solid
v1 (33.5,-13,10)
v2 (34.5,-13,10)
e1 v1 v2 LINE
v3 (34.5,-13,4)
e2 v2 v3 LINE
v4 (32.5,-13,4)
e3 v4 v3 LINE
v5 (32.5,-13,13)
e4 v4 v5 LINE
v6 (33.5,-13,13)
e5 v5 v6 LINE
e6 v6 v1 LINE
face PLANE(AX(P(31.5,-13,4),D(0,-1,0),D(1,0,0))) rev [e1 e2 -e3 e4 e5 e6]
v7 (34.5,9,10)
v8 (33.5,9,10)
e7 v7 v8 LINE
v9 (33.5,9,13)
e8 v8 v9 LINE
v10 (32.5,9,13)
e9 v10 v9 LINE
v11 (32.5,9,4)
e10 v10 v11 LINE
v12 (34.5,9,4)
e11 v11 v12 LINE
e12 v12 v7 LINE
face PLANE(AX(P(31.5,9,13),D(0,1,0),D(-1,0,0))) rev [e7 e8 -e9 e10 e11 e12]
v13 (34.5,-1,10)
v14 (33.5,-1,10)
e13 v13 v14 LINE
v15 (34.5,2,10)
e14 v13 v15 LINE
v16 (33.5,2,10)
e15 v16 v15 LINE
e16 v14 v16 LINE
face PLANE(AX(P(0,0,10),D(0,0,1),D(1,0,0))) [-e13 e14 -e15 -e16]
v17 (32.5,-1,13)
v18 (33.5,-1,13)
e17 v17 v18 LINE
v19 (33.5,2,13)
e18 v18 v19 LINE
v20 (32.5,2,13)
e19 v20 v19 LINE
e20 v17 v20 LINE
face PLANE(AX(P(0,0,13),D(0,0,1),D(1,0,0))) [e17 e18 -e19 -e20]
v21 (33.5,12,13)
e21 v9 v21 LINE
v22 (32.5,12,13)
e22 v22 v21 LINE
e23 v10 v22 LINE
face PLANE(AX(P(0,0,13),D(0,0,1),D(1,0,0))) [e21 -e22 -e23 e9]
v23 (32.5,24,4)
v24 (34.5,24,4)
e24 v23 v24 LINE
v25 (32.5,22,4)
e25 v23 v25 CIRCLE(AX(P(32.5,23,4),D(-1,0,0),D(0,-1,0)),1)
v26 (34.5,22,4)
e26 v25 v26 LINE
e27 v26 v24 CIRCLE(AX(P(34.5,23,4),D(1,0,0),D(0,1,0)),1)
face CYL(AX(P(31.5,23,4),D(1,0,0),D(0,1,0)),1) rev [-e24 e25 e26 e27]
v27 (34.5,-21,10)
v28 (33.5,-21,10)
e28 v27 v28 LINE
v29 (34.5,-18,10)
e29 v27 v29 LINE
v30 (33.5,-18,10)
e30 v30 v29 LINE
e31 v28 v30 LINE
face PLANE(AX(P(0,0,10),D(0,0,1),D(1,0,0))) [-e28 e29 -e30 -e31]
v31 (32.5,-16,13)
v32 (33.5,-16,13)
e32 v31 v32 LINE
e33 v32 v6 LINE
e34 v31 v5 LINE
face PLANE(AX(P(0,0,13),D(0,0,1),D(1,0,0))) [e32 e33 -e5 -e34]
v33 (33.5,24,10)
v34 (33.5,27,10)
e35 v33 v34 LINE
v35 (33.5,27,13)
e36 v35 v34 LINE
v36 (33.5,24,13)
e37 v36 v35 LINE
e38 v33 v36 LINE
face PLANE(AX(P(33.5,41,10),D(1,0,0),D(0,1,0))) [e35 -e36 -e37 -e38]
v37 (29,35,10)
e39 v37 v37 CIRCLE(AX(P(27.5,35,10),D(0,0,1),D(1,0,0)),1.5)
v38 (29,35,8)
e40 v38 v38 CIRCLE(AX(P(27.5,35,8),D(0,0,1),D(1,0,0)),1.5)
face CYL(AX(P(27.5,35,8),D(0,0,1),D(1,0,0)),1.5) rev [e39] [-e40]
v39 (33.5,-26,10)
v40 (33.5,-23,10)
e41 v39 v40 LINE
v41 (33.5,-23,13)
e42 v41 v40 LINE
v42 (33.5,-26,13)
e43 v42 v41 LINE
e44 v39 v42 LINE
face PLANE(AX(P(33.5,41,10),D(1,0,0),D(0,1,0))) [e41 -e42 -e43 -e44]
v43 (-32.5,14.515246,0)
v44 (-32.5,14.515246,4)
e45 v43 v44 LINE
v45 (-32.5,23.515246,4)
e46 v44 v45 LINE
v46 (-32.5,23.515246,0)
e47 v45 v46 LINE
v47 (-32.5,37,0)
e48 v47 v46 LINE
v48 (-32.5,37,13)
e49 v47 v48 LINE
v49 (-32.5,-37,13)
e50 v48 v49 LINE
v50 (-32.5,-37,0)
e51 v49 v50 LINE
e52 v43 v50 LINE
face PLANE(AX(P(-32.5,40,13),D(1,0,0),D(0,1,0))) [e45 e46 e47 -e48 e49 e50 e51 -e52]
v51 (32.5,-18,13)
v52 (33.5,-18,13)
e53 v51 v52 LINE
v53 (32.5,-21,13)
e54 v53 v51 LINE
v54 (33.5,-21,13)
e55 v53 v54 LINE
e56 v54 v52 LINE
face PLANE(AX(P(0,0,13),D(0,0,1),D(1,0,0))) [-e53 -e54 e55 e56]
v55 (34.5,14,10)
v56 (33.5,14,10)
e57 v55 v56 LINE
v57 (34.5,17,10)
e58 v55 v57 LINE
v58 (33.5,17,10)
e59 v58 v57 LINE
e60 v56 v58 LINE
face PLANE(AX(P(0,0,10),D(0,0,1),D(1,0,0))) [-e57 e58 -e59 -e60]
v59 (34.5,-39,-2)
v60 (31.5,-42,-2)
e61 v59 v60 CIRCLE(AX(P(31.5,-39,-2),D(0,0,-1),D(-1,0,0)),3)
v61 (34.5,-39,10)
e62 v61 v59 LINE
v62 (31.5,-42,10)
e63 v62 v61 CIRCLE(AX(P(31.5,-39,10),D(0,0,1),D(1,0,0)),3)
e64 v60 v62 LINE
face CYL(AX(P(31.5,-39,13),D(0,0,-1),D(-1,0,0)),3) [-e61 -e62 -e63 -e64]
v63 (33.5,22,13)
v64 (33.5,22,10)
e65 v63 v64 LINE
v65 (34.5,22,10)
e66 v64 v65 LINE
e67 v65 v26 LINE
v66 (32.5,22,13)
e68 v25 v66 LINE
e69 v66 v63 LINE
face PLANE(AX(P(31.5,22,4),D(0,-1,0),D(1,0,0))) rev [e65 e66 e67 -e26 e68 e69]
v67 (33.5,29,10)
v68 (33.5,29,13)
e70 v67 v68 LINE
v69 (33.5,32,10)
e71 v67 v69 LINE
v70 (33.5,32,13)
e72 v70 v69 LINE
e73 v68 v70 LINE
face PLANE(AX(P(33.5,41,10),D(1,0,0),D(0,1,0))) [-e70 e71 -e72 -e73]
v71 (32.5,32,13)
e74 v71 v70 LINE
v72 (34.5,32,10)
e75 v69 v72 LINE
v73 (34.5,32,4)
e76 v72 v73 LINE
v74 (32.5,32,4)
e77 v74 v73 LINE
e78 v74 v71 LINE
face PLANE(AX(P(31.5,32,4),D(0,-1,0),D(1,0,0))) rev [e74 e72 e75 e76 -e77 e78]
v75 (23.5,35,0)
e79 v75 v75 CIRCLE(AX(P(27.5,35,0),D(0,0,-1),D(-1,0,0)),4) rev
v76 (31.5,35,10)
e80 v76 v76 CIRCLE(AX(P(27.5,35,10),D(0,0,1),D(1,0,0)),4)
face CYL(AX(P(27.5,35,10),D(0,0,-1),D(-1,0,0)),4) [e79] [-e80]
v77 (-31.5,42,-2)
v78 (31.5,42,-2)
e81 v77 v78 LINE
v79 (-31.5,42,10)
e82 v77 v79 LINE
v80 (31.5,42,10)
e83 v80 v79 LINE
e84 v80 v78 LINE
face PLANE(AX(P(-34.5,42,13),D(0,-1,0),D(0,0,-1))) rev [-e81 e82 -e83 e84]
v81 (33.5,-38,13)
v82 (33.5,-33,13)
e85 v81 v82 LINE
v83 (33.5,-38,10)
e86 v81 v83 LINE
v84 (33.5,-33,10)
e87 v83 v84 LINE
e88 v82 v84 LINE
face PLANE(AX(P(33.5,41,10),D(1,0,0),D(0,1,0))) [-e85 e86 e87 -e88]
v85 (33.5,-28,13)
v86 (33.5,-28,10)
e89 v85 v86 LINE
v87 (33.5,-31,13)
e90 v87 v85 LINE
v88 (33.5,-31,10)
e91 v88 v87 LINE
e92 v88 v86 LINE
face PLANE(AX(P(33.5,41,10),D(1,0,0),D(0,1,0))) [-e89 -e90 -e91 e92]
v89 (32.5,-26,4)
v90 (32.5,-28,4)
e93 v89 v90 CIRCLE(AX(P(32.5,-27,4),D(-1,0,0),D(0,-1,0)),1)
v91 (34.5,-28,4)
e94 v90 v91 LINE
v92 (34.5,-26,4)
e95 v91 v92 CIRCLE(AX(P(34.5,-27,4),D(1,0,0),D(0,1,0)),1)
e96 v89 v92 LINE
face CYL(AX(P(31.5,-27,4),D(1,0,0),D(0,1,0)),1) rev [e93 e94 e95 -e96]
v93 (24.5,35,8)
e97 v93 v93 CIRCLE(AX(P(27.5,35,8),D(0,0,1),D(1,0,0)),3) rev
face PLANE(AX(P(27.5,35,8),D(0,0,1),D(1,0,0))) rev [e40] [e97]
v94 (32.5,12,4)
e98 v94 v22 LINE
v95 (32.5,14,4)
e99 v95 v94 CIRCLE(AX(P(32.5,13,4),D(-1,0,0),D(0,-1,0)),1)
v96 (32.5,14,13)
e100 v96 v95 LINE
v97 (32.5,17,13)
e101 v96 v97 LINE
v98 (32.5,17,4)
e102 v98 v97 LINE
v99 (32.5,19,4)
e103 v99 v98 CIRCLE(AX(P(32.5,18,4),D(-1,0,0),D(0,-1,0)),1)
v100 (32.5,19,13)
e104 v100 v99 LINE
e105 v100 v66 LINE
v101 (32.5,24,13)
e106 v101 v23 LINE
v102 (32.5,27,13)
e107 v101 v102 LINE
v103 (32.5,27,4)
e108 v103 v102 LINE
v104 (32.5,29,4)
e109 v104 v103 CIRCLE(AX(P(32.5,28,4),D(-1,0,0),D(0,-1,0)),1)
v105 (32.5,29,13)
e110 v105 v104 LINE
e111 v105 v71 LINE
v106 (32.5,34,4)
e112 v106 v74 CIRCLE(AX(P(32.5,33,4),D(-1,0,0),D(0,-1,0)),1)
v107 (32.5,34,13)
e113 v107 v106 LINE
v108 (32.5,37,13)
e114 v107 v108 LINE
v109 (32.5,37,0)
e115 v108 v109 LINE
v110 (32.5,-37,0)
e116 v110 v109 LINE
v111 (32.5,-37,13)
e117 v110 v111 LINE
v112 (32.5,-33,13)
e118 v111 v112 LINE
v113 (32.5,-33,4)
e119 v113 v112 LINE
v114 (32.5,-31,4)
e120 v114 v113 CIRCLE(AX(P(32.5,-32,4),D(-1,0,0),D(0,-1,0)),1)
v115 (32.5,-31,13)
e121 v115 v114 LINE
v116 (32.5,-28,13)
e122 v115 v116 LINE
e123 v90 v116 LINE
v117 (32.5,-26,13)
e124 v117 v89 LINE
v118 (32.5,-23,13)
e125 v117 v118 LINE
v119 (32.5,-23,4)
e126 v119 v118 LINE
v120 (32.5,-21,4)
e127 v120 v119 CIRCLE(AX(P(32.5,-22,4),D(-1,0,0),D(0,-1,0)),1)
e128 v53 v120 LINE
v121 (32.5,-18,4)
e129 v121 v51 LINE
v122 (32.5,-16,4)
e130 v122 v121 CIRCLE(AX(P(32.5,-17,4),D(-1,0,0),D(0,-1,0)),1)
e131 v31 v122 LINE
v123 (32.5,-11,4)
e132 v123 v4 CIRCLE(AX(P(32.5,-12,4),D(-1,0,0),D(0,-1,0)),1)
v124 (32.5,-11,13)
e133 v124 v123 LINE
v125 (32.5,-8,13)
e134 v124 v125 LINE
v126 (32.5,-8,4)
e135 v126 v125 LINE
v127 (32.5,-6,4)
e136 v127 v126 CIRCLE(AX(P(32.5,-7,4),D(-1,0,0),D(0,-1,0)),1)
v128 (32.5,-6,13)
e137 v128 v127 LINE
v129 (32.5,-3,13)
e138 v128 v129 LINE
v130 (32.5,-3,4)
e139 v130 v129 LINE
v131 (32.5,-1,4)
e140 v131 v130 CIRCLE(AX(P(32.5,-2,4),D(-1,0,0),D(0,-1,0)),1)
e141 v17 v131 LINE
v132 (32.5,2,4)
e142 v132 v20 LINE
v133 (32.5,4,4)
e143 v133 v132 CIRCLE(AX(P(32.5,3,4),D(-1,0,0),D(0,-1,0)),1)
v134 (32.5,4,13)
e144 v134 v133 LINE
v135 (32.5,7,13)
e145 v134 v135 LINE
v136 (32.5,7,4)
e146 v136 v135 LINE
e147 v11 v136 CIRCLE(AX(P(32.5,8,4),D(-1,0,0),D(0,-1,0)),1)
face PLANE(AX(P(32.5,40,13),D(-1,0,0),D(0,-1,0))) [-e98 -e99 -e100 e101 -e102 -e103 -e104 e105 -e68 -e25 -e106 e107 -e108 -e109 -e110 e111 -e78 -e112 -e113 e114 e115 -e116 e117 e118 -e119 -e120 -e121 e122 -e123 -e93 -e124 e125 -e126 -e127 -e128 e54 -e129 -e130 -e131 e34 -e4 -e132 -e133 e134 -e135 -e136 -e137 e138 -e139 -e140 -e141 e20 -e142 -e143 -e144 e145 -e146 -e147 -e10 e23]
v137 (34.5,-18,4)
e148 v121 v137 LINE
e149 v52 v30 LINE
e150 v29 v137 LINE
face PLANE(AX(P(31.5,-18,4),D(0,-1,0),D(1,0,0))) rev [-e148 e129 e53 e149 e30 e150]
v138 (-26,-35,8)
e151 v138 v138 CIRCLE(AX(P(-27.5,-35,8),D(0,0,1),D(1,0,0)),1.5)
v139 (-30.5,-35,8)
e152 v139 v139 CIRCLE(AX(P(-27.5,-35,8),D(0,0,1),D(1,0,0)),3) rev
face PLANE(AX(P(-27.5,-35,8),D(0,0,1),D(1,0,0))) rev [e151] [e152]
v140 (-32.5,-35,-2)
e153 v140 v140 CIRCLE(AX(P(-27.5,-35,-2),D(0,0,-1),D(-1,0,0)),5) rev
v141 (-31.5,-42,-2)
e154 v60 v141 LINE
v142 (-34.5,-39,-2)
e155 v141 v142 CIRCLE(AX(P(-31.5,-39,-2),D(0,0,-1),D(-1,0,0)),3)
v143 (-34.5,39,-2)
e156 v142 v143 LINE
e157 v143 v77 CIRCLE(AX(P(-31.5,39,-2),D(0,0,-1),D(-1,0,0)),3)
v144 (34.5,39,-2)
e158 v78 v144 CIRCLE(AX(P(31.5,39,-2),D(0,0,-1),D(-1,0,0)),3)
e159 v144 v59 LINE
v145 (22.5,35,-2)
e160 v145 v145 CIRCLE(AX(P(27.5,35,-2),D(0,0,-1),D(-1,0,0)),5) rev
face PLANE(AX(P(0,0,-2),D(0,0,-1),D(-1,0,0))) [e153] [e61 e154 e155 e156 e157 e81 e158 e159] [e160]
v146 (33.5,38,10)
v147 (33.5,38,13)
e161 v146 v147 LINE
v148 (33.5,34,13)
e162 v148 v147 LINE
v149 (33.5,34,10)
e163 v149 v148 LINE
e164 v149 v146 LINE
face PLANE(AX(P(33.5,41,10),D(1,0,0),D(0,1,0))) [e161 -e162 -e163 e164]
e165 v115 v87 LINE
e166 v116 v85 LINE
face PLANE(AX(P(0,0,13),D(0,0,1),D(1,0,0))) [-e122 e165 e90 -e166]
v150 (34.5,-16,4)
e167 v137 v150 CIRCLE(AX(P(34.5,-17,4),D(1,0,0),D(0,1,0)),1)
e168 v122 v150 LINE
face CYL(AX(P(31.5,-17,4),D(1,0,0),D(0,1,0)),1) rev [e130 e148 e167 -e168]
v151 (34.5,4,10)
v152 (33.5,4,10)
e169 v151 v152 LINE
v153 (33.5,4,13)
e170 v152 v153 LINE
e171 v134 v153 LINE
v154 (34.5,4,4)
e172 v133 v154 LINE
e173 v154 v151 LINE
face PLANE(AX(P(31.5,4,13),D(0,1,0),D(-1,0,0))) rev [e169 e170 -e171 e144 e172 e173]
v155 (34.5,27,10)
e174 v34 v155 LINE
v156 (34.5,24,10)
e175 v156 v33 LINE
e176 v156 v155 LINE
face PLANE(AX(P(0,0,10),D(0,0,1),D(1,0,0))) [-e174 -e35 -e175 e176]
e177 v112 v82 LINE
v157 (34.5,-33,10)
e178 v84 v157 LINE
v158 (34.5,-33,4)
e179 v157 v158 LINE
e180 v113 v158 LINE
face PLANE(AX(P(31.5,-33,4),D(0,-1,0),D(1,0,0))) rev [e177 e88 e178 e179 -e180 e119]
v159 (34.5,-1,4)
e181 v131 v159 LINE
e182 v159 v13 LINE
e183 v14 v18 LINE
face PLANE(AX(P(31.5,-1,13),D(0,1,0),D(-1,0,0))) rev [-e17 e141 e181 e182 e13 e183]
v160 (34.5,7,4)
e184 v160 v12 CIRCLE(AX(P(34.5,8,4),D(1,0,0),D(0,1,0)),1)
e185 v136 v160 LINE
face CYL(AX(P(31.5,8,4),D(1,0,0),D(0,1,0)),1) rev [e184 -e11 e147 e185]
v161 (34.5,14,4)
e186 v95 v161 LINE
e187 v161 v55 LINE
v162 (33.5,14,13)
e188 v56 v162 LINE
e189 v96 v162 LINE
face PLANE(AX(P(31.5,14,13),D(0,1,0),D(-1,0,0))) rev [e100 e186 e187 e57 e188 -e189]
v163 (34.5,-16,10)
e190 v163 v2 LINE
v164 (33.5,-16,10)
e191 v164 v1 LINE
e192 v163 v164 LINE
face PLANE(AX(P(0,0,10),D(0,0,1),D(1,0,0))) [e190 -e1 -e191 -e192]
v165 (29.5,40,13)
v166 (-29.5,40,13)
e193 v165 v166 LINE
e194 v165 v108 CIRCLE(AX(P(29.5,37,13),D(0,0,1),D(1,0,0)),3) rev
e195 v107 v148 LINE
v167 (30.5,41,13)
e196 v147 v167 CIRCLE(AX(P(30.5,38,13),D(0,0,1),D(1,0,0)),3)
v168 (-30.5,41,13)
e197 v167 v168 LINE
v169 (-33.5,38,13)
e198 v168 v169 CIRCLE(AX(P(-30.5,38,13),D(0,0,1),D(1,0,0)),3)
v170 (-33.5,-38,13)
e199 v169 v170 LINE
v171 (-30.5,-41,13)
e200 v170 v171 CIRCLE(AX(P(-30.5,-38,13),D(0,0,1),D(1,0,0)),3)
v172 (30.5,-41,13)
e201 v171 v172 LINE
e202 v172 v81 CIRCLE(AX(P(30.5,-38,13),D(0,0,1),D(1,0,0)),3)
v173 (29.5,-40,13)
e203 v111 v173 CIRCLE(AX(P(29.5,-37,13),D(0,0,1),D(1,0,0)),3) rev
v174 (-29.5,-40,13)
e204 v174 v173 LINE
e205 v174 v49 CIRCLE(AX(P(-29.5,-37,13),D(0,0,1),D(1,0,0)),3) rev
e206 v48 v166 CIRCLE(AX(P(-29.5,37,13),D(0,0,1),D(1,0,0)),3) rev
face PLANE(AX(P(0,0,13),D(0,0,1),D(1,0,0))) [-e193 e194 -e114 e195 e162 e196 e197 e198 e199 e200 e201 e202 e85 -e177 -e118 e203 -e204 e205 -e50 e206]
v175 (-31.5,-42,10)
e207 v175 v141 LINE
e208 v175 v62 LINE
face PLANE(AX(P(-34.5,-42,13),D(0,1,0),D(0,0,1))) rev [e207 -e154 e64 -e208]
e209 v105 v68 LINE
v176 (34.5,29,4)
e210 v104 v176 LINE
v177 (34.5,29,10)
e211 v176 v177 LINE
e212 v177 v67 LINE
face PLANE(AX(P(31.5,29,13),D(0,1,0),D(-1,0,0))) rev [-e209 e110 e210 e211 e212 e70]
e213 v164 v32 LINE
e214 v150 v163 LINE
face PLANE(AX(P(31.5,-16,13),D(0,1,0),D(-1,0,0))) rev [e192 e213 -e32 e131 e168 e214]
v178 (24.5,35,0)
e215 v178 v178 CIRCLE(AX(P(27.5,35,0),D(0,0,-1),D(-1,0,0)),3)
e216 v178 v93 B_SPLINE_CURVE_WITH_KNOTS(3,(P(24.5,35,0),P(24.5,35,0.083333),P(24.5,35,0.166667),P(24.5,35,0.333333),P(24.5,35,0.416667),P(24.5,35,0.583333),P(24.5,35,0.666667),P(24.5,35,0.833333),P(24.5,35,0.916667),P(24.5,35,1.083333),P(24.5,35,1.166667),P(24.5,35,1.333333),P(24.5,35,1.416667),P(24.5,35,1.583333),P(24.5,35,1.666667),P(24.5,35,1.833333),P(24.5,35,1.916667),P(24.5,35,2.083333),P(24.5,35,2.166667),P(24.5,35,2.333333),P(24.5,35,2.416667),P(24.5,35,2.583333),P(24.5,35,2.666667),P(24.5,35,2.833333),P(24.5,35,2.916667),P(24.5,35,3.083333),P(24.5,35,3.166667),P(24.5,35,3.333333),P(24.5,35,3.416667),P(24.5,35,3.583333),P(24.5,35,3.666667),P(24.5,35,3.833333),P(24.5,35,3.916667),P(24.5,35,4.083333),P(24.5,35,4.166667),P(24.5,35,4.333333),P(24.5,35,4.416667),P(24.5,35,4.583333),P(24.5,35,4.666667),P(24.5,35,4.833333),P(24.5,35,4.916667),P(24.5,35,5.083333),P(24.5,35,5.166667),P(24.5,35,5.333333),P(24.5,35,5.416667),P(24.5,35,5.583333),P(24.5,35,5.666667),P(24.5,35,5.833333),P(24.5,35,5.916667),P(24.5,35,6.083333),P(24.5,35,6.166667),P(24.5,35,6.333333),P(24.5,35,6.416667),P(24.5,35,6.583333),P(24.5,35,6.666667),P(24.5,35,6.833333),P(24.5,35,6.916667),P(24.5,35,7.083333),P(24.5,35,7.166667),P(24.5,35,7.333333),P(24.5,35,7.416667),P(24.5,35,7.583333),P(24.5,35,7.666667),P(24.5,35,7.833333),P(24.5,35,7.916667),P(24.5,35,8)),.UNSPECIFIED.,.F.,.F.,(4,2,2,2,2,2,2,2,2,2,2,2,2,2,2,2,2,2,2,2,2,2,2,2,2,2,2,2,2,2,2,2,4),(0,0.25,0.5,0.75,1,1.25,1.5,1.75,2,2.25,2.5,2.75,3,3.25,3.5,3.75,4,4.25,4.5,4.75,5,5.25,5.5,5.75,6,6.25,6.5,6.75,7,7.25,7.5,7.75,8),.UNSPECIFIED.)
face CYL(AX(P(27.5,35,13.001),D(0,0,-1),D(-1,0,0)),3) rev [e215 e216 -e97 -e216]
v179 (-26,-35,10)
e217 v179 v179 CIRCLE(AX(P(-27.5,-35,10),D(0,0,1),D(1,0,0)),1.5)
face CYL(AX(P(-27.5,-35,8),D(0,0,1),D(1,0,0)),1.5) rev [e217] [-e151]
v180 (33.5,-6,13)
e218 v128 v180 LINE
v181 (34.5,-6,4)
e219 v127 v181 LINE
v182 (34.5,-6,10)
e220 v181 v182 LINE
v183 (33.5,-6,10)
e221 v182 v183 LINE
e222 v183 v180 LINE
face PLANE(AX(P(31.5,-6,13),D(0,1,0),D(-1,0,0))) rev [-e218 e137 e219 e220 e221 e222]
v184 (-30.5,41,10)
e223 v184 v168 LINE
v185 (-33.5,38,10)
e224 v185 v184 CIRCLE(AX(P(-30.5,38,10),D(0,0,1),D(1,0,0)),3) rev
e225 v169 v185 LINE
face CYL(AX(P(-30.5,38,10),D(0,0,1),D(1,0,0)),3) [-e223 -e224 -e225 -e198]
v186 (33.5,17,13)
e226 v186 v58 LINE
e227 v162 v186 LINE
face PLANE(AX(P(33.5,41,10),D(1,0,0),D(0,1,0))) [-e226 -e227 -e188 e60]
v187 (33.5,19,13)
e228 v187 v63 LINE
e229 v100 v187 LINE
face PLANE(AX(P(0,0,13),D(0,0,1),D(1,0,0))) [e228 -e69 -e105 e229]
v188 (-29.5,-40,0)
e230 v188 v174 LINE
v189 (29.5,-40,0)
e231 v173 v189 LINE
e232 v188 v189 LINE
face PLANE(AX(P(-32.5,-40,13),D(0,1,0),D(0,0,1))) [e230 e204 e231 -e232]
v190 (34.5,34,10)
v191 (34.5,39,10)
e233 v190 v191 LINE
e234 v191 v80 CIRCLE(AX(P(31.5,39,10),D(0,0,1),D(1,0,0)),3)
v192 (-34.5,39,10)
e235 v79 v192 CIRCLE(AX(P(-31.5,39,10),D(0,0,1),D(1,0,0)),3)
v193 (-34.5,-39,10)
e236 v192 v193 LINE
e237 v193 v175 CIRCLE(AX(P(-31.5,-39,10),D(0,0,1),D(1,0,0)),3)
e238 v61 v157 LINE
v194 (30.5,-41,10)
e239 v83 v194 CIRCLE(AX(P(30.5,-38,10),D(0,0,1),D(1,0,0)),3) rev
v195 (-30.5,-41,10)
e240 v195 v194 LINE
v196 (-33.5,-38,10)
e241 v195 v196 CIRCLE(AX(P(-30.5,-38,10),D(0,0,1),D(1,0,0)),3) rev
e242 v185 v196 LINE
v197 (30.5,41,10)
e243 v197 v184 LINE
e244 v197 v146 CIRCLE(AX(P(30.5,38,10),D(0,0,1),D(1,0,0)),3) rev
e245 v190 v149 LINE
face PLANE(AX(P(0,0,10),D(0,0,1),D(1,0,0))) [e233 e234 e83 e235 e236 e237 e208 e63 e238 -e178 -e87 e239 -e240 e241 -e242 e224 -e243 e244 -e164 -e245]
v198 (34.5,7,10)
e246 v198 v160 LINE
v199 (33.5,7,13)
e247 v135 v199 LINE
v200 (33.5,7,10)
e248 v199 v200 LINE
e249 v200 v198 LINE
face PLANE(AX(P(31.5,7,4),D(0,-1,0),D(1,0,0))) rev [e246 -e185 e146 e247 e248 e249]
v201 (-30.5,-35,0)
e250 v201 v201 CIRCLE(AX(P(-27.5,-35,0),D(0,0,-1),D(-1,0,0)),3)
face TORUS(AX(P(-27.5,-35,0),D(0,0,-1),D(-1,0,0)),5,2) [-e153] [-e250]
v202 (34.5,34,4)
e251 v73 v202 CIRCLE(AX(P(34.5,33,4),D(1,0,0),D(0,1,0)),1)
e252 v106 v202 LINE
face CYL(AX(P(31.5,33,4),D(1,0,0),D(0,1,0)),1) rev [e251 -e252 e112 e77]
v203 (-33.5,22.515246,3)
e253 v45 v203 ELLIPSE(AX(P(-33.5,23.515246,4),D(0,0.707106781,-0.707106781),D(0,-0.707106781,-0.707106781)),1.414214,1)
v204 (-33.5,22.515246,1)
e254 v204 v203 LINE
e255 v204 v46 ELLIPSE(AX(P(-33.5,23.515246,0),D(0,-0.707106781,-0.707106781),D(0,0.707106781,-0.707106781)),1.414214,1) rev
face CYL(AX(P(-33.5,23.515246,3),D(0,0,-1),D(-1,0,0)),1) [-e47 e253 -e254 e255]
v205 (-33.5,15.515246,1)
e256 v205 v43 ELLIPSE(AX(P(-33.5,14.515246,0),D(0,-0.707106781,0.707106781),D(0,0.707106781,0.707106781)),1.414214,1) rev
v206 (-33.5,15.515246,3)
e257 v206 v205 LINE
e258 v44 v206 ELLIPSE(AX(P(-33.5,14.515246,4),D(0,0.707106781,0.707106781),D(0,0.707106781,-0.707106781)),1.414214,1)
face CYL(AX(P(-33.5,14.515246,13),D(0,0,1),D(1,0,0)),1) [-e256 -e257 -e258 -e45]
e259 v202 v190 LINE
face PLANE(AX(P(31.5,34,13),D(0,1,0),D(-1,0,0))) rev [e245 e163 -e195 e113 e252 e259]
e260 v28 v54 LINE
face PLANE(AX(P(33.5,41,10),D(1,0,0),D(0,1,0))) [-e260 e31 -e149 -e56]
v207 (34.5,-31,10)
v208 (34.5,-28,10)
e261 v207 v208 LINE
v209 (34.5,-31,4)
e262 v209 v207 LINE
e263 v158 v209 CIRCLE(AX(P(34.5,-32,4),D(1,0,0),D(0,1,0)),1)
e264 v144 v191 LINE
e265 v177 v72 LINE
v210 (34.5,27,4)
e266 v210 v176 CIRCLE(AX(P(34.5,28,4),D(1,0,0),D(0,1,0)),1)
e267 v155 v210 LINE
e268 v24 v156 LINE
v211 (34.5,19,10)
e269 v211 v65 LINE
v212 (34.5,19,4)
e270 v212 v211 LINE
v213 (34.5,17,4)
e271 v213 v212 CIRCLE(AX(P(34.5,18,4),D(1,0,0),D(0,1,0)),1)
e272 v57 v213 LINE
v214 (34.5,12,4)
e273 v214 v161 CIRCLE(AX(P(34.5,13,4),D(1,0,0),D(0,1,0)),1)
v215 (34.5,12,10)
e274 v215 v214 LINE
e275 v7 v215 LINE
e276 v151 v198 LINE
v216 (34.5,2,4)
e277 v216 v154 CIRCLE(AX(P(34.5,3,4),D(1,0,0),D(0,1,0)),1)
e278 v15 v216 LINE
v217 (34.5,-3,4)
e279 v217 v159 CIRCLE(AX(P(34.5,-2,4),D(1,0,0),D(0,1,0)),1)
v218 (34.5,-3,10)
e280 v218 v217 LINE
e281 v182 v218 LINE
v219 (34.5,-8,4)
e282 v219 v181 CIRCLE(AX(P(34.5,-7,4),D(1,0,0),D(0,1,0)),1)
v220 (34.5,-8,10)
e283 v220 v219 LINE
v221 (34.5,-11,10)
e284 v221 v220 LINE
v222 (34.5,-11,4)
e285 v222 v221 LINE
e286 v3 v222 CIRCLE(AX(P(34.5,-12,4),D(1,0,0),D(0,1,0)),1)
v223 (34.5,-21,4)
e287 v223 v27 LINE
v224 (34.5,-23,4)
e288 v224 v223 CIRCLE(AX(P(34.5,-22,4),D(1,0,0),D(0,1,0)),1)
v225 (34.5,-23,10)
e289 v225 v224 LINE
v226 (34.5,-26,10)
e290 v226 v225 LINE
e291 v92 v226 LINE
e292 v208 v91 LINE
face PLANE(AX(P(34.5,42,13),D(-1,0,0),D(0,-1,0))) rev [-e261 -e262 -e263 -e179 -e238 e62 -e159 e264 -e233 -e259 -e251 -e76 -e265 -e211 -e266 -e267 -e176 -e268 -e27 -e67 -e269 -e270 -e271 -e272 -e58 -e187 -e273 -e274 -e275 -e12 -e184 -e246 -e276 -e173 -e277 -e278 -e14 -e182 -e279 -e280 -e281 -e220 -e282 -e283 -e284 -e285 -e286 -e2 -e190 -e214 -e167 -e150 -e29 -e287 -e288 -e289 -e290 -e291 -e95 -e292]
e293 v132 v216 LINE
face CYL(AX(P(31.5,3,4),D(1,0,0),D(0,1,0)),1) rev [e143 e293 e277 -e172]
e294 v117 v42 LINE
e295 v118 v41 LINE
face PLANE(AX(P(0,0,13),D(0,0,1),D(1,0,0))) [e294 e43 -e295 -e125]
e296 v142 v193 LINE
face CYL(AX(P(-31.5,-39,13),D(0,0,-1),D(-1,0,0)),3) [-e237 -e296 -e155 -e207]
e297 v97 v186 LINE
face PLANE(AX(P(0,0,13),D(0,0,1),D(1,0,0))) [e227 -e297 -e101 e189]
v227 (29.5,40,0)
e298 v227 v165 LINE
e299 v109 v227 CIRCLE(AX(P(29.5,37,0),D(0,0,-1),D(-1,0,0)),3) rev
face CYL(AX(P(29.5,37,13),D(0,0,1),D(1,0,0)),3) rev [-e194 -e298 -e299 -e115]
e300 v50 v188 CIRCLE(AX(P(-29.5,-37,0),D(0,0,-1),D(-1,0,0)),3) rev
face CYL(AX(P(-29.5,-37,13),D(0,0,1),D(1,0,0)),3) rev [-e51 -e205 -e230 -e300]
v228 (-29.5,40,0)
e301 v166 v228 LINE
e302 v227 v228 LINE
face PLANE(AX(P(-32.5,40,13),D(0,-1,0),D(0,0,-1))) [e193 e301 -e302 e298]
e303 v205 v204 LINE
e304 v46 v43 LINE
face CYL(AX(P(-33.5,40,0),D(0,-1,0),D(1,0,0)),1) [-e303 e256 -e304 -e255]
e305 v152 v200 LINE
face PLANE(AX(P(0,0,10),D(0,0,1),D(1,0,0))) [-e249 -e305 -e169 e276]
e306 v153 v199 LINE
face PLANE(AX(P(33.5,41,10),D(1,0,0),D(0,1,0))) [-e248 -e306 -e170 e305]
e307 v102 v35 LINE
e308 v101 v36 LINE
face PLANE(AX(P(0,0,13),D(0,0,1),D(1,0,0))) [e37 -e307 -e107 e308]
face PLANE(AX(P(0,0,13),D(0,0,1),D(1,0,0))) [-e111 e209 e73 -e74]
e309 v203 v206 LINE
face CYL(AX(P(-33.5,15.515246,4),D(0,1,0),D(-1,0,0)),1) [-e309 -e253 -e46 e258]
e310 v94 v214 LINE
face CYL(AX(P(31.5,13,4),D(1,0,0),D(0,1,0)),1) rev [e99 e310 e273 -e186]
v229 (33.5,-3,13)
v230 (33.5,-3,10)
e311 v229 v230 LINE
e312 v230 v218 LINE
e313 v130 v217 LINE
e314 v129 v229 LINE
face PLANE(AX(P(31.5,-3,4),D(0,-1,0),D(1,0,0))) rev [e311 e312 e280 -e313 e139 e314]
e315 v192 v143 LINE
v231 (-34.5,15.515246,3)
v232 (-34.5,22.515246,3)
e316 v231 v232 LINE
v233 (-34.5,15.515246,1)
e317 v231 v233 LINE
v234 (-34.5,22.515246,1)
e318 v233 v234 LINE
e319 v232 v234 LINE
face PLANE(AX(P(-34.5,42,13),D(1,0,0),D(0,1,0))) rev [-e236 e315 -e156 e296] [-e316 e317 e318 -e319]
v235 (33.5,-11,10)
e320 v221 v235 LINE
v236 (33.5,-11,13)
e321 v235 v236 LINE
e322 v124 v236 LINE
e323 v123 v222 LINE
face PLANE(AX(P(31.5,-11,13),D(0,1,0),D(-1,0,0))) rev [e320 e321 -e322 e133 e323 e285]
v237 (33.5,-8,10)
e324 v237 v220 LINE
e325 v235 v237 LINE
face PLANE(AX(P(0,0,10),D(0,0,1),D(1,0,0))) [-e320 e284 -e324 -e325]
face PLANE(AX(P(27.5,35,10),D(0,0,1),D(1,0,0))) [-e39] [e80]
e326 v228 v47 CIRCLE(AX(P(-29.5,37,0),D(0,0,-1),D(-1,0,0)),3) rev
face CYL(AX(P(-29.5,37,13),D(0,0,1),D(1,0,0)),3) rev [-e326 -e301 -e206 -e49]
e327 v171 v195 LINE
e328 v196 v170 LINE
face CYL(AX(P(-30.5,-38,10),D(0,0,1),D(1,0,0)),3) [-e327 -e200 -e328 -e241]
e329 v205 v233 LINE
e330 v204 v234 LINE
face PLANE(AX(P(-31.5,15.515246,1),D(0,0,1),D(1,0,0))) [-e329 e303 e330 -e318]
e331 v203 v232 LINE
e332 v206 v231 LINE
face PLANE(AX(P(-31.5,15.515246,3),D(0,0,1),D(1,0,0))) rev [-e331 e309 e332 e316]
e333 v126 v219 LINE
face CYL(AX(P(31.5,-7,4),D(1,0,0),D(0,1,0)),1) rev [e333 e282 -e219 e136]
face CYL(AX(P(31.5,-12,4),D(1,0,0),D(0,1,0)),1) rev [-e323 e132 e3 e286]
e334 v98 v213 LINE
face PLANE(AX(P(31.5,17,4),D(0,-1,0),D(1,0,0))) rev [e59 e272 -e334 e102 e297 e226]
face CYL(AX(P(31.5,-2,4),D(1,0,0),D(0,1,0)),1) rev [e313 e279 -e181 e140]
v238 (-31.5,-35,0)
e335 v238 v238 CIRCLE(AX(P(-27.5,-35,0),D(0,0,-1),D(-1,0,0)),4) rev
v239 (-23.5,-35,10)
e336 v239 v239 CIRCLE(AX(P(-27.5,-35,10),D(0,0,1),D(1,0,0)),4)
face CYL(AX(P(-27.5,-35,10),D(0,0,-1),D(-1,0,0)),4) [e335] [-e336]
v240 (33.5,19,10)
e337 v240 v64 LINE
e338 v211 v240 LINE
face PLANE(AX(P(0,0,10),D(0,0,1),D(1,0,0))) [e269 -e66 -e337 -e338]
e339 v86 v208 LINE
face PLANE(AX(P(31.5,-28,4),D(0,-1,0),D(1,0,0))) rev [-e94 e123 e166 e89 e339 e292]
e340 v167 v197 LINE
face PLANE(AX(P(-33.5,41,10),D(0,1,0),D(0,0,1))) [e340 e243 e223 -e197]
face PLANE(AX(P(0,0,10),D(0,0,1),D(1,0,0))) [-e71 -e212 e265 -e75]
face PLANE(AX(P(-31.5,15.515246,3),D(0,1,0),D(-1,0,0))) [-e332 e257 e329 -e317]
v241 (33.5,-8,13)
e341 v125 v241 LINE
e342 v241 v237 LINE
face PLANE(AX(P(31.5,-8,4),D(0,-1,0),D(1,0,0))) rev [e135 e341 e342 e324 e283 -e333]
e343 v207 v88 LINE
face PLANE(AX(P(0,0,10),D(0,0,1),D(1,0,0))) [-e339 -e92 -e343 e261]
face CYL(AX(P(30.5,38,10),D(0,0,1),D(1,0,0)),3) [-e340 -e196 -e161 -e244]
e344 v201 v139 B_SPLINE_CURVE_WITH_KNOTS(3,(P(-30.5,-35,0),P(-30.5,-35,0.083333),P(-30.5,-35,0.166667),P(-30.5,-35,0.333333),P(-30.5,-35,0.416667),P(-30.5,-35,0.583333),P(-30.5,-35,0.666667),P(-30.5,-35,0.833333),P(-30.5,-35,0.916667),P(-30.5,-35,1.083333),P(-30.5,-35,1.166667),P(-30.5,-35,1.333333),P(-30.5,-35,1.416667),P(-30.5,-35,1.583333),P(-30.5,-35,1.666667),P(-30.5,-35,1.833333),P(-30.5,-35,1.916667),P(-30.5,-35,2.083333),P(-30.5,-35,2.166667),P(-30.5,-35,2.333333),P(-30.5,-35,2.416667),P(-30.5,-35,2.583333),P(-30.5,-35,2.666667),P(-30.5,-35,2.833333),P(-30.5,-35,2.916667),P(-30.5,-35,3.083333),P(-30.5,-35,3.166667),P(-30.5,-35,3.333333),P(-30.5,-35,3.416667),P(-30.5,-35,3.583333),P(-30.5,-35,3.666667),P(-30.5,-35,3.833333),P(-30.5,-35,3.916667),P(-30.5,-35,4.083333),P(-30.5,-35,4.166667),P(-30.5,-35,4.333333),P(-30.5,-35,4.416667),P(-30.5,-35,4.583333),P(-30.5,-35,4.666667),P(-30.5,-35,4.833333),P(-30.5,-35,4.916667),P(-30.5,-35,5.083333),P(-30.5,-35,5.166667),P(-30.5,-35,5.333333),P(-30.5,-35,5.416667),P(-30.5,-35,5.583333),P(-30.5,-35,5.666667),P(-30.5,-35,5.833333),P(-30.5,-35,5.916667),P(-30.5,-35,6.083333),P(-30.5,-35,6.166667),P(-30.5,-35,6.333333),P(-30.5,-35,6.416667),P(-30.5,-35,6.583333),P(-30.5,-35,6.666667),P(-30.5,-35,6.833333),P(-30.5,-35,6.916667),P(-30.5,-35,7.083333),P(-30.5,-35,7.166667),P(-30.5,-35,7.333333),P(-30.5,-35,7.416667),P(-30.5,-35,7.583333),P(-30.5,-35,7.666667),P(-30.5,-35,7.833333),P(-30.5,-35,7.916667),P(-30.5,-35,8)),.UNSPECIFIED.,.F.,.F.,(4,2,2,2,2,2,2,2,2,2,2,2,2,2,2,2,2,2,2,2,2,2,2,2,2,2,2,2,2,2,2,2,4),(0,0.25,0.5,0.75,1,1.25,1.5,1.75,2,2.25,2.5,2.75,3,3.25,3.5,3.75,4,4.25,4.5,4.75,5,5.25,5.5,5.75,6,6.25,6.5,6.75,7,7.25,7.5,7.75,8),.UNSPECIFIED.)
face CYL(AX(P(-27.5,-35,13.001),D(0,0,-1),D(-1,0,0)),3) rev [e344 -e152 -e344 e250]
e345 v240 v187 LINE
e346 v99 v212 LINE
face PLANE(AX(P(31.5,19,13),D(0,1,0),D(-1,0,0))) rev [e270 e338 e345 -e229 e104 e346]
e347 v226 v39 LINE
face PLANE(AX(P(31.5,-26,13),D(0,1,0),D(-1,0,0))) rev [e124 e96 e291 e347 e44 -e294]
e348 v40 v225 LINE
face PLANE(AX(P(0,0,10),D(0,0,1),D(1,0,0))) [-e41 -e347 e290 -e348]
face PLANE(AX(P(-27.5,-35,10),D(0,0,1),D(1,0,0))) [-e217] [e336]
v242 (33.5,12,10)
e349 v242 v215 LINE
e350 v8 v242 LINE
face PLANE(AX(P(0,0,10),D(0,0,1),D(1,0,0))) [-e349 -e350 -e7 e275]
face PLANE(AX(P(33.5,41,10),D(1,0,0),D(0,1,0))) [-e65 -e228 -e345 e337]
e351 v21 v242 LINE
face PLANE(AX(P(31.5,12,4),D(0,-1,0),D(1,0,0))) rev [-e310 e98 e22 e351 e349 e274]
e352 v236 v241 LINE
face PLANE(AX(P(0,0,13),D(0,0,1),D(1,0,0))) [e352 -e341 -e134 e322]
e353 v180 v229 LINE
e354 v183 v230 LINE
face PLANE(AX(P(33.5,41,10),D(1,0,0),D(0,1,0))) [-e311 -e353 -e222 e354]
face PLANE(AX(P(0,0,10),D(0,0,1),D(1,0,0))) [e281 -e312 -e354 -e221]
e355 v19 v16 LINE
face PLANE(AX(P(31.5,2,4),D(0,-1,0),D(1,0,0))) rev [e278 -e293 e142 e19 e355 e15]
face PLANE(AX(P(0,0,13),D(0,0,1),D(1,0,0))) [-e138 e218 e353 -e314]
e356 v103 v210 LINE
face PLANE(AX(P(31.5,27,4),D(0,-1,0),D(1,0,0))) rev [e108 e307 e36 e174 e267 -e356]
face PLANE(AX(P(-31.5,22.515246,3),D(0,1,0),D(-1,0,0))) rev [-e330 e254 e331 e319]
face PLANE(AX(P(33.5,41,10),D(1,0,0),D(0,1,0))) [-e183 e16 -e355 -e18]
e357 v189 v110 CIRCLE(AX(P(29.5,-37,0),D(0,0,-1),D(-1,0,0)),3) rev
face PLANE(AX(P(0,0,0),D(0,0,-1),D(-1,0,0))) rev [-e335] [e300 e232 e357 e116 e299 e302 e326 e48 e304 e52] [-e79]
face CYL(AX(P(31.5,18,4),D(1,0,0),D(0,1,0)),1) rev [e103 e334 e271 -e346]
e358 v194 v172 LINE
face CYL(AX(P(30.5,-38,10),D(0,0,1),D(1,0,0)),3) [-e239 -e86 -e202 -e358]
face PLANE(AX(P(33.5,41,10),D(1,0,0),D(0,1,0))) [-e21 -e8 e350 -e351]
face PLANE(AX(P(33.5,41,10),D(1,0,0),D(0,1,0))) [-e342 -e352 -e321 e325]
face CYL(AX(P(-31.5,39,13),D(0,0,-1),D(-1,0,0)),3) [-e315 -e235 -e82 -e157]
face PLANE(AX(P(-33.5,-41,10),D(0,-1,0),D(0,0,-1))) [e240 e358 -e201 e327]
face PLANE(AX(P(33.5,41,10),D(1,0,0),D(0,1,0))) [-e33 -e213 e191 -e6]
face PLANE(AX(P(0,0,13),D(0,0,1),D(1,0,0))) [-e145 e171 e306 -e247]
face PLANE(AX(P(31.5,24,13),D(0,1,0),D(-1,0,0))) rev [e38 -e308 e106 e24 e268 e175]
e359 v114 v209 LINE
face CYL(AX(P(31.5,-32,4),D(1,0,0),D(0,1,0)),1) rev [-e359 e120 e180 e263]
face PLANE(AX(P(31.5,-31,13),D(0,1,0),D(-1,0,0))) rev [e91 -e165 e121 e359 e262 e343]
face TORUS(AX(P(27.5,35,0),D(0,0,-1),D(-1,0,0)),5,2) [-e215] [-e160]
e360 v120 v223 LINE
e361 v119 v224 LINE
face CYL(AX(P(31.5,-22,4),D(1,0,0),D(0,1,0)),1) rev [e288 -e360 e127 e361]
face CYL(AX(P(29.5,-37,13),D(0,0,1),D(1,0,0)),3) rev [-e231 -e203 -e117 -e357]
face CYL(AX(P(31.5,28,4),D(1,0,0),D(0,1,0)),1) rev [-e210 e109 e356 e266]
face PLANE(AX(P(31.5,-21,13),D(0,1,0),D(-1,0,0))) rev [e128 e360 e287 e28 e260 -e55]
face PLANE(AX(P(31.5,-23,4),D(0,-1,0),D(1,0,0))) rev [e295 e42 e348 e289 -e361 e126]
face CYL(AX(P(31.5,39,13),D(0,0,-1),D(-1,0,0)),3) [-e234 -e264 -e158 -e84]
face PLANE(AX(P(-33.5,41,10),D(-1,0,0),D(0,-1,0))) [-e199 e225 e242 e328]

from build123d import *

# Parameters (mm, degrees)
SKETCH2_W           = 69
SKETCH2_H           = 84
SKETCH2_W_2         = 65
SKETCH2_H_2         = 80
BOSS_EXTRUDE1_DEPTH = 13
SKETCH3_OUTSIDE_W   = 92.896
SKETCH3_OUTSIDE_H   = 107.896
SKETCH3_OUTSIDE_W_2 = 67
SKETCH3_OUTSIDE_H_2 = 82
CUT_EXTRUDE1_DEPTH  = 3
SKETCH4_W           = 69
SKETCH4_H           = 84
BOSS_EXTRUDE2_DEPTH = 2
FILLET1_R           = 3
CUT_EXTRUDE2_DEPTH  = 3
LPATTERN1_COUNT     = 14
LPATTERN1_PITCH     = 5
SKETCH6_R           = 4
BOSS_EXTRUDE3_DEPTH = 10
CUT_EXTRUDE3_REACH  = 58.385
SKETCH7_R           = 3
FILLET2_R           = 2
BOSS_EXTRUDE4_START = -2
SKETCH8_R           = 4
SKETCH8_R_2         = 1.5
BOSS_EXTRUDE4_DEPTH = 2
SKETCH10_W          = 2
SKETCH10_H          = 7
CUT_EXTRUDE4_DEPTH  = 3
FILLET10_R          = 1


with BuildPart() as part:
    # Sketch2 → Boss-Extrude1 (new body)
    with BuildSketch(Plane.XY):
        Rectangle(SKETCH2_W, SKETCH2_H)
        Rectangle(SKETCH2_W_2, SKETCH2_H_2, mode=Mode.SUBTRACT)
    extrude(amount=BOSS_EXTRUDE1_DEPTH)

    # Sketch3 outside → Cut-Extrude1 (cut)
    with BuildSketch(Plane.XY.offset(13)):
        Rectangle(SKETCH3_OUTSIDE_W, SKETCH3_OUTSIDE_H)
        Rectangle(SKETCH3_OUTSIDE_W_2, SKETCH3_OUTSIDE_H_2, mode=Mode.SUBTRACT)
    extrude(amount=-CUT_EXTRUDE1_DEPTH, mode=Mode.SUBTRACT)

    # Sketch4 → Boss-Extrude2 (add)
    with BuildSketch(Plane(origin=(0, 0, 0), x_dir=(-1, 0, 0), z_dir=(0, 0, -1))):
        Rectangle(SKETCH4_W, SKETCH4_H)
    extrude(amount=BOSS_EXTRUDE2_DEPTH)

    # Fillet1
    fillet1_edges = [part.edges().sort_by_distance(p)[0] for p in [
        (32.5, -40, 6.5),
        (32.5, 40, 6.5),
        (-32.5, 40, 6.5),
        (-32.5, -40, 6.5),
        (34.5, -42, 4),
        (-34.5, -42, 4),
        (-34.5, 42, 4),
        (34.5, 42, 4),
        (33.5, -41, 11.5),
        (-33.5, -41, 11.5),
        (-33.5, 41, 11.5),
        (33.5, 41, 11.5),
    ]]
    fillet(fillet1_edges, radius=FILLET1_R)

    # Sketch5 → Cut-Extrude2 (cut)
    with BuildSketch(Plane(origin=(34.5, 0, 0), x_dir=(0, 0, -1), z_dir=(1, 0, 0))):
        with BuildLine():
            Line((-4, -33), (-13, -33))
            Line((-13, -33), (-13, -31))
            Line((-13, -31), (-4, -31))
            ThreePointArc((-4, -31), (-3, -32), (-4, -33))
        make_face()
    cut_extrude2 = extrude(amount=-CUT_EXTRUDE2_DEPTH, mode=Mode.SUBTRACT)

    # LPattern1: Cut-Extrude2 ×14
    with Locations(*[(0, i * LPATTERN1_PITCH, 0) for i in range(1, LPATTERN1_COUNT)]):
        add(cut_extrude2, mode=Mode.SUBTRACT)

    # Sketch6 → Boss-Extrude3 (add)
    with BuildSketch(Plane.XY):
        with Locations(Location((27.5, 35, 0), (0, 0, 180))):
            Circle(SKETCH6_R)
        with Locations(Location((-27.5, -35, 0), (0, 0, 180))):
            Circle(SKETCH6_R)
    extrude(amount=BOSS_EXTRUDE3_DEPTH)

    # Sketch7 → Cut-Extrude3 (cut, up to next)
    with BuildSketch(Plane(origin=(0, 0, -2), x_dir=(-1, 0, 0), z_dir=(0, 0, -1)), mode=Mode.PRIVATE) as cut_extrude3_sk1:
        with Locations((27.5, -35)):
            Circle(SKETCH7_R)
    cut_extrude3_tool1 = extrude(cut_extrude3_sk1.sketch, amount=-CUT_EXTRUDE3_REACH, mode=Mode.PRIVATE) & part.part
    # Sketch7 → Cut-Extrude3 (cut, up to next)
    with BuildSketch(Plane(origin=(0, 0, -2), x_dir=(-1, 0, 0), z_dir=(0, 0, -1)), mode=Mode.PRIVATE) as cut_extrude3_sk2:
        with Locations((-27.5, 35)):
            Circle(SKETCH7_R)
    cut_extrude3_tool2 = extrude(cut_extrude3_sk2.sketch, amount=-CUT_EXTRUDE3_REACH, mode=Mode.PRIVATE) & part.part
    add(cut_extrude3_tool1.solids().sort_by_distance((-27.5, -35, -2))[0], mode=Mode.SUBTRACT)
    add(cut_extrude3_tool2.solids().sort_by_distance((27.5, 35, -2))[0], mode=Mode.SUBTRACT)

    # Fillet2
    fillet2_edges = [part.edges().sort_by_distance(p)[0] for p in [
        (-24.5, -35, -2),
        (30.5, 35, -2),
    ]]
    fillet(fillet2_edges, radius=FILLET2_R)

    # Sketch8 → Boss-Extrude4 (add)
    # profile 1 of 2: a face of its own
    with BuildSketch(Plane.XY.offset(10).offset(BOSS_EXTRUDE4_START)):
        with Locations(Location((-27.5, -35, 0), (0, 0, 180))):
            Circle(SKETCH8_R)
        with Locations((-27.5, -35)):
            Circle(SKETCH8_R_2, mode=Mode.SUBTRACT)
    # profile 2 of 2: a face of its own
    with BuildSketch(Plane.XY.offset(10).offset(BOSS_EXTRUDE4_START)):
        with Locations(Location((27.5, 35, 0), (0, 0, 180))):
            Circle(SKETCH8_R)
        with Locations((27.5, 35)):
            Circle(SKETCH8_R_2, mode=Mode.SUBTRACT)
    extrude(amount=BOSS_EXTRUDE4_DEPTH)

    # Sketch10 → Cut-Extrude4 (cut)
    with BuildSketch(Plane.ZY.offset(34.5)):
        with Locations((2, 19.01524614)):
            Rectangle(SKETCH10_W, SKETCH10_H)
    extrude(amount=-CUT_EXTRUDE4_DEPTH, mode=Mode.SUBTRACT)

    # Fillet10
    fillet10_edges = [part.edges().sort_by_distance(p)[0] for p in [
        (-32.5, 22.51524614, 2),
        (-32.5, 19.01524614, 1),
        (-32.5, 15.51524614, 2),
        (-32.5, 19.01524614, 3),
    ]]
    fillet(fillet10_edges, radius=FILLET10_R - 0.0001)  # a hair under: the kernel refuses the full size


solid = part.part
